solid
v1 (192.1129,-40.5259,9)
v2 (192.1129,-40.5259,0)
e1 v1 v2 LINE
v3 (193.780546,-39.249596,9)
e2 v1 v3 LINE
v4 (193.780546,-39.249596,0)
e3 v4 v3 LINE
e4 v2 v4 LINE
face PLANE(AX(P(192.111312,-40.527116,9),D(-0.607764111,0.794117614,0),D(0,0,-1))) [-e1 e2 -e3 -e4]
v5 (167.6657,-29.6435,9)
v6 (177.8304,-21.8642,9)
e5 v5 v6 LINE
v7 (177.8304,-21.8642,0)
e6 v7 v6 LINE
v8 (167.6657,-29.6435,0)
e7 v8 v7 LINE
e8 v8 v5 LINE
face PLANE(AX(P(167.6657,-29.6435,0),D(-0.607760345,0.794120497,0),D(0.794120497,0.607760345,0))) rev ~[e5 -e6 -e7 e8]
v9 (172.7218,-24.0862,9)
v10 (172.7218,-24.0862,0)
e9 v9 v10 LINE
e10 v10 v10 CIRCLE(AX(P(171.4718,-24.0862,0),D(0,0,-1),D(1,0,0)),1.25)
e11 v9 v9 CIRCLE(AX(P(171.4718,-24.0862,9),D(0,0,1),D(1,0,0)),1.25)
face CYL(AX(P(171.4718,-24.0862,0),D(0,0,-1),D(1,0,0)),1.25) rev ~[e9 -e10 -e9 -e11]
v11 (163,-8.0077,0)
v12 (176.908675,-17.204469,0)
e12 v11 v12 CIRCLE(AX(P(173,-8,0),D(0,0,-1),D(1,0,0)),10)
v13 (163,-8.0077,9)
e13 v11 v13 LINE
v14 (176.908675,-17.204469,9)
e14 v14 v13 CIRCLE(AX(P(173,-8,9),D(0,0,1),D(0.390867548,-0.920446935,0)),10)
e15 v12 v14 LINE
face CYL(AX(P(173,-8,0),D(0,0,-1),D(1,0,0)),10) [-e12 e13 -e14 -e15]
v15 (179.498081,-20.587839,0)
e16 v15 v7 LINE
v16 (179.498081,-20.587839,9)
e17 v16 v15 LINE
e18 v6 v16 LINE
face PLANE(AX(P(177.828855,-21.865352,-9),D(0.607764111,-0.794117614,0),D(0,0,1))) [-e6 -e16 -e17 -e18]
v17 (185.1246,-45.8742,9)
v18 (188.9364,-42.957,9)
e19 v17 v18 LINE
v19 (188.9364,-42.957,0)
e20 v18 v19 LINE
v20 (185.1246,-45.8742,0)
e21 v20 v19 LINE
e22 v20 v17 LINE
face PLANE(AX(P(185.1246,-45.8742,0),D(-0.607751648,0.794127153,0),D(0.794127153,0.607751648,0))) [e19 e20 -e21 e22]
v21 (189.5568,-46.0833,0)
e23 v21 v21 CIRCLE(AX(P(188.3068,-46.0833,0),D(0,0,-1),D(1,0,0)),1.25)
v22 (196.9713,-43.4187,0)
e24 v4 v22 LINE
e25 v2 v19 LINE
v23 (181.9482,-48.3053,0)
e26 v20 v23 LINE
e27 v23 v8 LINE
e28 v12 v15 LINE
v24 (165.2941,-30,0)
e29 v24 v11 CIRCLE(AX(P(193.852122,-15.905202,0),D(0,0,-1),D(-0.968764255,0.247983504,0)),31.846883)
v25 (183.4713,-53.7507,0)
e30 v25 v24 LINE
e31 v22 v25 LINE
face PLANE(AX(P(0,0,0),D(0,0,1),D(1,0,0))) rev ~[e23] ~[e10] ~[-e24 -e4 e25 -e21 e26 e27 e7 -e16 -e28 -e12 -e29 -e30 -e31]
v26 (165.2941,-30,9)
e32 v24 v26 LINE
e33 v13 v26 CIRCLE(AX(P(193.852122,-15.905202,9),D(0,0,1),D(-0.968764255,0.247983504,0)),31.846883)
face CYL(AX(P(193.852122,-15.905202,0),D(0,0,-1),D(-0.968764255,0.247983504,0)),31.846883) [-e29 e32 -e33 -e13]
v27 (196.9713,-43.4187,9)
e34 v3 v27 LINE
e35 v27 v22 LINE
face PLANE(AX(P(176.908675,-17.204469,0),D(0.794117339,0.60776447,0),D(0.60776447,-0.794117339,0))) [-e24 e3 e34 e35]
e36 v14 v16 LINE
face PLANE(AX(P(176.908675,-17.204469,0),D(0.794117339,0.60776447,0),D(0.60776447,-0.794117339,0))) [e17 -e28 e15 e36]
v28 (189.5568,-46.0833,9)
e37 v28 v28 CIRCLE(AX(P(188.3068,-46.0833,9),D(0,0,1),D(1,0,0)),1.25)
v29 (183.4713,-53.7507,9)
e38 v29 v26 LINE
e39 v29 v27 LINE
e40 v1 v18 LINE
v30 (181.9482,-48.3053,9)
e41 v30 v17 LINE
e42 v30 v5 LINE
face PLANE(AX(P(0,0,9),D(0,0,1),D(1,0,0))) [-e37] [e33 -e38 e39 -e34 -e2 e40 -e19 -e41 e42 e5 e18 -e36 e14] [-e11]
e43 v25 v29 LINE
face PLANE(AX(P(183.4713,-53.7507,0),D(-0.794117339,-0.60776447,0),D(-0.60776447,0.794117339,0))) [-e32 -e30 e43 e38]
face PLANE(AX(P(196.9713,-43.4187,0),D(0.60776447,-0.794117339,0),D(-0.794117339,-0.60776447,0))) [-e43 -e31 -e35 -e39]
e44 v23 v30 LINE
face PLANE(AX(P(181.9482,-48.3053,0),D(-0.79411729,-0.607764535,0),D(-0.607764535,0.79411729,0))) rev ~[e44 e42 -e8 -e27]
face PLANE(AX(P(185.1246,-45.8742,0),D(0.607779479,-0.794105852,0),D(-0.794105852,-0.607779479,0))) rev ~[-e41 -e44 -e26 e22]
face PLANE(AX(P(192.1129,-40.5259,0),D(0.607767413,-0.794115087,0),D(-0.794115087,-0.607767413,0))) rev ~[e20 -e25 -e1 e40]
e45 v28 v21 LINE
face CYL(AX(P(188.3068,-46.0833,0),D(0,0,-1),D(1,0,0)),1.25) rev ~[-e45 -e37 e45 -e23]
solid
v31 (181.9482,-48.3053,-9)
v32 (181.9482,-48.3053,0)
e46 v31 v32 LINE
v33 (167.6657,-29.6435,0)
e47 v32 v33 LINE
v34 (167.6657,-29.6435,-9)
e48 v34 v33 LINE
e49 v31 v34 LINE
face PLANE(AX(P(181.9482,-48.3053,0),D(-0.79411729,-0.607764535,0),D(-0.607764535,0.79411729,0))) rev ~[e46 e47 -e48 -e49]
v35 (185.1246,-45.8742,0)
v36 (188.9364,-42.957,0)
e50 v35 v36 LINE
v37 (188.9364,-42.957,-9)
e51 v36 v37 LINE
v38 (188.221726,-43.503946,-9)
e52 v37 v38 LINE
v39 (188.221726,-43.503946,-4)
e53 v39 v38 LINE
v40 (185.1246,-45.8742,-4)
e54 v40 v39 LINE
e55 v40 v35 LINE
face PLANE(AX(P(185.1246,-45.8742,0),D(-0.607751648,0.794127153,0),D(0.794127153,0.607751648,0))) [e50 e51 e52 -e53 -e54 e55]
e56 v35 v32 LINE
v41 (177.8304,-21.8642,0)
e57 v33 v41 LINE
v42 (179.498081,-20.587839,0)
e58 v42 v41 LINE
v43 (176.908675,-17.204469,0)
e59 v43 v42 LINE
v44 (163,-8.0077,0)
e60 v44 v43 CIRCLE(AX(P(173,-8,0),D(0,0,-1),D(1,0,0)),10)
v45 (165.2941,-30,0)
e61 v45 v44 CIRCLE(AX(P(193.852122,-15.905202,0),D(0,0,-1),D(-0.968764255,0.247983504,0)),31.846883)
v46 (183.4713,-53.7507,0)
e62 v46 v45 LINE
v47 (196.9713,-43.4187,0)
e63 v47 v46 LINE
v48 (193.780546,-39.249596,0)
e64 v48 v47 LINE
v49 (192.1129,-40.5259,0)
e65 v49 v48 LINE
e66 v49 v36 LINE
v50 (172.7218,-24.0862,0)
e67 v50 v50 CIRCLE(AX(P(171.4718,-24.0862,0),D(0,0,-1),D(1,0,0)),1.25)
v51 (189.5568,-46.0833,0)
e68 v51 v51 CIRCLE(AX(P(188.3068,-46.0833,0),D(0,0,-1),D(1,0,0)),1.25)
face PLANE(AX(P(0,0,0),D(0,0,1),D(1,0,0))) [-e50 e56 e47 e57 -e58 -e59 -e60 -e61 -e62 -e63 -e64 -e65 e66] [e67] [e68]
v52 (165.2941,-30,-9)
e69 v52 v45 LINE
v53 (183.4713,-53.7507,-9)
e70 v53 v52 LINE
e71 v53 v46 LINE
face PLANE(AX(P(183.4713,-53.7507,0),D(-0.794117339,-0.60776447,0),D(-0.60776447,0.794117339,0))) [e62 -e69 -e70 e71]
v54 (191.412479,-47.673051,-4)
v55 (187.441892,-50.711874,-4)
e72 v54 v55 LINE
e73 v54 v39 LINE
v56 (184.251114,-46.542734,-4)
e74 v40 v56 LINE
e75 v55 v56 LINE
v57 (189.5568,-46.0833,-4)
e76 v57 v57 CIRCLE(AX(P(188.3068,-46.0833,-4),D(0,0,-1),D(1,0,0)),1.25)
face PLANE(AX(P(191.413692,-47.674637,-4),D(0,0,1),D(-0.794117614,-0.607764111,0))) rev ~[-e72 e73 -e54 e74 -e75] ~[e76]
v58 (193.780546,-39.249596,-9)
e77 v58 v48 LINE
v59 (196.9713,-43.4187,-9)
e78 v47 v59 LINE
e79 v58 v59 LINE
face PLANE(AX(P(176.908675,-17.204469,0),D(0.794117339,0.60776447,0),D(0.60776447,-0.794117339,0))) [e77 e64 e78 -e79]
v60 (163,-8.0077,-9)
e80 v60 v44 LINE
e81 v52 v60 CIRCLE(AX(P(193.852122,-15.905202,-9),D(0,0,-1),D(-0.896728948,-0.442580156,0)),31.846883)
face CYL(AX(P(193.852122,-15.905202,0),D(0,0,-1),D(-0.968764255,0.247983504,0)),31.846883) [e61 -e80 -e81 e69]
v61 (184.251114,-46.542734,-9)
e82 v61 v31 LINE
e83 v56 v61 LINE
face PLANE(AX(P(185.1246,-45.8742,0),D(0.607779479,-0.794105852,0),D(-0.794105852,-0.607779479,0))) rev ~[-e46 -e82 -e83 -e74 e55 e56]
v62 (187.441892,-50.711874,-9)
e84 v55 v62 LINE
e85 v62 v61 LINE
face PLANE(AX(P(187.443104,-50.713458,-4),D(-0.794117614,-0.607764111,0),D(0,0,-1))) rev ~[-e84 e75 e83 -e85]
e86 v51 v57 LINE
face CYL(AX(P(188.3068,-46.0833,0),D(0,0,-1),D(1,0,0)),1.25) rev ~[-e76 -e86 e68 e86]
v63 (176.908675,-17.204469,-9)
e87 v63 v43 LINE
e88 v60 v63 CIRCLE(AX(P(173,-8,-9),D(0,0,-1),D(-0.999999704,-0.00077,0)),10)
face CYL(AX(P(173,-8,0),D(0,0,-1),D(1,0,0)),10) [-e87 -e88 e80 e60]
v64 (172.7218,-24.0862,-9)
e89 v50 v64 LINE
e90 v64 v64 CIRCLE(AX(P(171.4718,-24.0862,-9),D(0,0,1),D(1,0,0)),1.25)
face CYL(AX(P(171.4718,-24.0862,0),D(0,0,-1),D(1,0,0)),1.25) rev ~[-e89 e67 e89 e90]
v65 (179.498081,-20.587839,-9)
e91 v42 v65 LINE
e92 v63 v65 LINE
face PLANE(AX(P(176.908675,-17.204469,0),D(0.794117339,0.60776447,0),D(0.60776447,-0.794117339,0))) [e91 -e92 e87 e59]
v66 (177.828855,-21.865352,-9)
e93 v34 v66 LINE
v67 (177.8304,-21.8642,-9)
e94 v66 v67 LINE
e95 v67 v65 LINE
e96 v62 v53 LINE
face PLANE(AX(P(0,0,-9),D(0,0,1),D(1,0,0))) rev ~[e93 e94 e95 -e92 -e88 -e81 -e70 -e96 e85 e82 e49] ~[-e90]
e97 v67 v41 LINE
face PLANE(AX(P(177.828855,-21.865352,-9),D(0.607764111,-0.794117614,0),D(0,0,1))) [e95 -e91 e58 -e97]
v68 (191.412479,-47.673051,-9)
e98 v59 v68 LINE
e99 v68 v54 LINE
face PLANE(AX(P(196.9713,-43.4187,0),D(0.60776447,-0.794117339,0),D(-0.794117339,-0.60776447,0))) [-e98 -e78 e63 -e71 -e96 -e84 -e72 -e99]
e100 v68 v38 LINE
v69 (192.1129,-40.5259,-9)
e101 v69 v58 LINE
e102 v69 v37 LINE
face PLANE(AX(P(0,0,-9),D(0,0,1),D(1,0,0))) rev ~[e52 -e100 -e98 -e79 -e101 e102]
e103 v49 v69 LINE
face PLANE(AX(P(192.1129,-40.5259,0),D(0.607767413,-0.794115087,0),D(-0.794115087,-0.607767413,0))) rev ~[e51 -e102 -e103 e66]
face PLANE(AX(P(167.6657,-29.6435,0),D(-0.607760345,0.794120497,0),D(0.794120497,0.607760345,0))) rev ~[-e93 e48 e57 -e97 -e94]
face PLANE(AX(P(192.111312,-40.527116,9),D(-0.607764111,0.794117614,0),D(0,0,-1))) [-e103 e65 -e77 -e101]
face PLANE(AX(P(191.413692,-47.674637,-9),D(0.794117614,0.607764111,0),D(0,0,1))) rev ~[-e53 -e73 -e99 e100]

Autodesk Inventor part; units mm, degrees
ref_plane "YZ Plane" through (0, 0, 0) normal (1, 0, 0) x (0, 1, 0)
ref_plane "XZ Plane" through (0, 0, 0) normal (0, 1, 0) x (-1, 0, 0)
ref_plane "XY Plane" through (0, 0, 0) normal (0, 0, 1) x (1, 0, 0)
sketch "스케치2" plane through (0, 0, 0) normal (0, 0, 1) x (1, 0, 0)
  line L0 (168.2265, -29.7181) -> (182.0227, -47.7445)
  line L1 (191.5521, -40.4514) -> (177.7559, -22.4249)
  line L2 (177.7559, -22.4249) -> (168.2265, -29.7181)
  line L3 (172.1391, -30.8815) -> (212.5451, -83.6769) projected
  line L4 (175.1246, -38.7313) -> (184.654, -31.4381) construction
  line L5 (172.9912, -26.0715) -> (186.7874, -44.098) construction
  line L6 (185.1992, -45.3135) -> (187.5087, -48.3311)
  line L7 (187.5087, -48.3311) -> (190.6852, -45.9001)
  line L8 (190.6852, -45.9001) -> (188.3757, -42.8824)
  line L9 (176.3073, -16.4187) -> (196.9713, -43.4187)
  line L10 (196.9713, -43.4187) -> (183.4713, -53.7507)
  line L11 (183.4713, -53.7507) -> (162.8073, -26.7507)
  line L12 (162.8073, -26.7507) -> (176.3073, -16.4187)
  line L13 (176.3073, -16.4187) -> (183.4713, -53.7507) construction
  line L14 (196.9713, -43.4187) -> (162.8073, -26.7507) construction
  line L15 (182.0227, -47.7445) -> (185.1992, -45.3135)
  line L16 (188.3757, -42.8824) -> (191.5521, -40.4514)
  line L17 (177.8304, -21.8642) -> (192.1129, -40.5259)
  line L18 (192.1129, -40.5259) -> (188.9364, -42.957)
  line L19 (188.9364, -42.957) -> (191.2459, -45.9746)
  line L20 (191.2459, -45.9746) -> (187.4341, -48.8919)
  line L21 (187.4341, -48.8919) -> (185.1246, -45.8742)
  line L22 (185.1246, -45.8742) -> (181.9482, -48.3053)
  line L23 (181.9482, -48.3053) -> (167.6657, -29.6435)
  line L24 (167.6657, -29.6435) -> (177.8304, -21.8642)
  circle A0 centre (173, -8) radius 10 projected
  line L25 (185.1246, -45.8742) -> (188.9364, -42.957)
  circle A1 centre (171.4718, -24.0862) radius 1.25
  circle A2 centre (188.3068, -46.0833) radius 1.25
  arc A3 (163, -8.0077) -> (165.2941, -30) centre (193.8521, -15.9052) ccw
  point P0 (0, 0)
  point P1 (179.8893, -35.0847)
  point P2 (179.8893, -35.0847)
  point P3 (176.9087, -17.2045)
  point P4 (174.3632, -17.9067)
  point P5 (163.6763, -26.0857)
  dimension "d0" = 22.7
  dimension "d1" = 12
  dimension "d2" = 4
  dimension "d3" = 26.5
  dimension "d4" = 34
  dimension "d5" = 17
  dimension "d6" = 0.4
  dimension "d9" = 2.5
  dimension "d10" = 2.5
  dimension "d16" = 3.6
extrude "돌출1" add sketch "스케치2" along normal mid plane 18 contours L25 L6 L7 L8 L19 L20 L21 | L25 L8 L7 L6 | L12 A0 L9 | L9 A0 L12 | L9 L10 L11 A3 L12 A0 | L12 A3 A0
sketch "스케치3" plane through (192.1129, -40.5259, -9) normal (-0.7941176, -0.6077641, 0) x (0, 0, 1)
  line L0 (18, 0) -> (0, 0) projected
  line L1 (18, 23.5) -> (18, 0) projected
  line L2 (0, 23.5) -> (18, 23.5) projected
  line L3 (0, 0) -> (0, 23.5) projected
  point P0 (9, 148.9416)
extrude "돌출2" cut sketch "스케치3" against normal blind 18
sketch "스케치4" plane through (196.9713, -43.4187, -9) normal (0.6077641, -0.7941176, 0) x (0.7941176, 0.6077641, 0)
  line L0 (0, 0) -> (-17, 0) projected
  line L1 (-12, 0) -> (-7, 0)
  line L2 (-7, 0) -> (-7, 5)
  line L3 (-7, 5) -> (-12, 5)
  line L4 (-12, 5) -> (-12, 0)
  point P0 (-130.03, 9)
  point P1 (-7, 0)
extrude "돌출3" cut sketch "스케치4" against normal blind 18
split body "분할1" result two bodies by plane through (0, 0, 0) normal (0, 0, 1) first body at (174.2785, -9.3972, 8.5)
properties part number "base"
